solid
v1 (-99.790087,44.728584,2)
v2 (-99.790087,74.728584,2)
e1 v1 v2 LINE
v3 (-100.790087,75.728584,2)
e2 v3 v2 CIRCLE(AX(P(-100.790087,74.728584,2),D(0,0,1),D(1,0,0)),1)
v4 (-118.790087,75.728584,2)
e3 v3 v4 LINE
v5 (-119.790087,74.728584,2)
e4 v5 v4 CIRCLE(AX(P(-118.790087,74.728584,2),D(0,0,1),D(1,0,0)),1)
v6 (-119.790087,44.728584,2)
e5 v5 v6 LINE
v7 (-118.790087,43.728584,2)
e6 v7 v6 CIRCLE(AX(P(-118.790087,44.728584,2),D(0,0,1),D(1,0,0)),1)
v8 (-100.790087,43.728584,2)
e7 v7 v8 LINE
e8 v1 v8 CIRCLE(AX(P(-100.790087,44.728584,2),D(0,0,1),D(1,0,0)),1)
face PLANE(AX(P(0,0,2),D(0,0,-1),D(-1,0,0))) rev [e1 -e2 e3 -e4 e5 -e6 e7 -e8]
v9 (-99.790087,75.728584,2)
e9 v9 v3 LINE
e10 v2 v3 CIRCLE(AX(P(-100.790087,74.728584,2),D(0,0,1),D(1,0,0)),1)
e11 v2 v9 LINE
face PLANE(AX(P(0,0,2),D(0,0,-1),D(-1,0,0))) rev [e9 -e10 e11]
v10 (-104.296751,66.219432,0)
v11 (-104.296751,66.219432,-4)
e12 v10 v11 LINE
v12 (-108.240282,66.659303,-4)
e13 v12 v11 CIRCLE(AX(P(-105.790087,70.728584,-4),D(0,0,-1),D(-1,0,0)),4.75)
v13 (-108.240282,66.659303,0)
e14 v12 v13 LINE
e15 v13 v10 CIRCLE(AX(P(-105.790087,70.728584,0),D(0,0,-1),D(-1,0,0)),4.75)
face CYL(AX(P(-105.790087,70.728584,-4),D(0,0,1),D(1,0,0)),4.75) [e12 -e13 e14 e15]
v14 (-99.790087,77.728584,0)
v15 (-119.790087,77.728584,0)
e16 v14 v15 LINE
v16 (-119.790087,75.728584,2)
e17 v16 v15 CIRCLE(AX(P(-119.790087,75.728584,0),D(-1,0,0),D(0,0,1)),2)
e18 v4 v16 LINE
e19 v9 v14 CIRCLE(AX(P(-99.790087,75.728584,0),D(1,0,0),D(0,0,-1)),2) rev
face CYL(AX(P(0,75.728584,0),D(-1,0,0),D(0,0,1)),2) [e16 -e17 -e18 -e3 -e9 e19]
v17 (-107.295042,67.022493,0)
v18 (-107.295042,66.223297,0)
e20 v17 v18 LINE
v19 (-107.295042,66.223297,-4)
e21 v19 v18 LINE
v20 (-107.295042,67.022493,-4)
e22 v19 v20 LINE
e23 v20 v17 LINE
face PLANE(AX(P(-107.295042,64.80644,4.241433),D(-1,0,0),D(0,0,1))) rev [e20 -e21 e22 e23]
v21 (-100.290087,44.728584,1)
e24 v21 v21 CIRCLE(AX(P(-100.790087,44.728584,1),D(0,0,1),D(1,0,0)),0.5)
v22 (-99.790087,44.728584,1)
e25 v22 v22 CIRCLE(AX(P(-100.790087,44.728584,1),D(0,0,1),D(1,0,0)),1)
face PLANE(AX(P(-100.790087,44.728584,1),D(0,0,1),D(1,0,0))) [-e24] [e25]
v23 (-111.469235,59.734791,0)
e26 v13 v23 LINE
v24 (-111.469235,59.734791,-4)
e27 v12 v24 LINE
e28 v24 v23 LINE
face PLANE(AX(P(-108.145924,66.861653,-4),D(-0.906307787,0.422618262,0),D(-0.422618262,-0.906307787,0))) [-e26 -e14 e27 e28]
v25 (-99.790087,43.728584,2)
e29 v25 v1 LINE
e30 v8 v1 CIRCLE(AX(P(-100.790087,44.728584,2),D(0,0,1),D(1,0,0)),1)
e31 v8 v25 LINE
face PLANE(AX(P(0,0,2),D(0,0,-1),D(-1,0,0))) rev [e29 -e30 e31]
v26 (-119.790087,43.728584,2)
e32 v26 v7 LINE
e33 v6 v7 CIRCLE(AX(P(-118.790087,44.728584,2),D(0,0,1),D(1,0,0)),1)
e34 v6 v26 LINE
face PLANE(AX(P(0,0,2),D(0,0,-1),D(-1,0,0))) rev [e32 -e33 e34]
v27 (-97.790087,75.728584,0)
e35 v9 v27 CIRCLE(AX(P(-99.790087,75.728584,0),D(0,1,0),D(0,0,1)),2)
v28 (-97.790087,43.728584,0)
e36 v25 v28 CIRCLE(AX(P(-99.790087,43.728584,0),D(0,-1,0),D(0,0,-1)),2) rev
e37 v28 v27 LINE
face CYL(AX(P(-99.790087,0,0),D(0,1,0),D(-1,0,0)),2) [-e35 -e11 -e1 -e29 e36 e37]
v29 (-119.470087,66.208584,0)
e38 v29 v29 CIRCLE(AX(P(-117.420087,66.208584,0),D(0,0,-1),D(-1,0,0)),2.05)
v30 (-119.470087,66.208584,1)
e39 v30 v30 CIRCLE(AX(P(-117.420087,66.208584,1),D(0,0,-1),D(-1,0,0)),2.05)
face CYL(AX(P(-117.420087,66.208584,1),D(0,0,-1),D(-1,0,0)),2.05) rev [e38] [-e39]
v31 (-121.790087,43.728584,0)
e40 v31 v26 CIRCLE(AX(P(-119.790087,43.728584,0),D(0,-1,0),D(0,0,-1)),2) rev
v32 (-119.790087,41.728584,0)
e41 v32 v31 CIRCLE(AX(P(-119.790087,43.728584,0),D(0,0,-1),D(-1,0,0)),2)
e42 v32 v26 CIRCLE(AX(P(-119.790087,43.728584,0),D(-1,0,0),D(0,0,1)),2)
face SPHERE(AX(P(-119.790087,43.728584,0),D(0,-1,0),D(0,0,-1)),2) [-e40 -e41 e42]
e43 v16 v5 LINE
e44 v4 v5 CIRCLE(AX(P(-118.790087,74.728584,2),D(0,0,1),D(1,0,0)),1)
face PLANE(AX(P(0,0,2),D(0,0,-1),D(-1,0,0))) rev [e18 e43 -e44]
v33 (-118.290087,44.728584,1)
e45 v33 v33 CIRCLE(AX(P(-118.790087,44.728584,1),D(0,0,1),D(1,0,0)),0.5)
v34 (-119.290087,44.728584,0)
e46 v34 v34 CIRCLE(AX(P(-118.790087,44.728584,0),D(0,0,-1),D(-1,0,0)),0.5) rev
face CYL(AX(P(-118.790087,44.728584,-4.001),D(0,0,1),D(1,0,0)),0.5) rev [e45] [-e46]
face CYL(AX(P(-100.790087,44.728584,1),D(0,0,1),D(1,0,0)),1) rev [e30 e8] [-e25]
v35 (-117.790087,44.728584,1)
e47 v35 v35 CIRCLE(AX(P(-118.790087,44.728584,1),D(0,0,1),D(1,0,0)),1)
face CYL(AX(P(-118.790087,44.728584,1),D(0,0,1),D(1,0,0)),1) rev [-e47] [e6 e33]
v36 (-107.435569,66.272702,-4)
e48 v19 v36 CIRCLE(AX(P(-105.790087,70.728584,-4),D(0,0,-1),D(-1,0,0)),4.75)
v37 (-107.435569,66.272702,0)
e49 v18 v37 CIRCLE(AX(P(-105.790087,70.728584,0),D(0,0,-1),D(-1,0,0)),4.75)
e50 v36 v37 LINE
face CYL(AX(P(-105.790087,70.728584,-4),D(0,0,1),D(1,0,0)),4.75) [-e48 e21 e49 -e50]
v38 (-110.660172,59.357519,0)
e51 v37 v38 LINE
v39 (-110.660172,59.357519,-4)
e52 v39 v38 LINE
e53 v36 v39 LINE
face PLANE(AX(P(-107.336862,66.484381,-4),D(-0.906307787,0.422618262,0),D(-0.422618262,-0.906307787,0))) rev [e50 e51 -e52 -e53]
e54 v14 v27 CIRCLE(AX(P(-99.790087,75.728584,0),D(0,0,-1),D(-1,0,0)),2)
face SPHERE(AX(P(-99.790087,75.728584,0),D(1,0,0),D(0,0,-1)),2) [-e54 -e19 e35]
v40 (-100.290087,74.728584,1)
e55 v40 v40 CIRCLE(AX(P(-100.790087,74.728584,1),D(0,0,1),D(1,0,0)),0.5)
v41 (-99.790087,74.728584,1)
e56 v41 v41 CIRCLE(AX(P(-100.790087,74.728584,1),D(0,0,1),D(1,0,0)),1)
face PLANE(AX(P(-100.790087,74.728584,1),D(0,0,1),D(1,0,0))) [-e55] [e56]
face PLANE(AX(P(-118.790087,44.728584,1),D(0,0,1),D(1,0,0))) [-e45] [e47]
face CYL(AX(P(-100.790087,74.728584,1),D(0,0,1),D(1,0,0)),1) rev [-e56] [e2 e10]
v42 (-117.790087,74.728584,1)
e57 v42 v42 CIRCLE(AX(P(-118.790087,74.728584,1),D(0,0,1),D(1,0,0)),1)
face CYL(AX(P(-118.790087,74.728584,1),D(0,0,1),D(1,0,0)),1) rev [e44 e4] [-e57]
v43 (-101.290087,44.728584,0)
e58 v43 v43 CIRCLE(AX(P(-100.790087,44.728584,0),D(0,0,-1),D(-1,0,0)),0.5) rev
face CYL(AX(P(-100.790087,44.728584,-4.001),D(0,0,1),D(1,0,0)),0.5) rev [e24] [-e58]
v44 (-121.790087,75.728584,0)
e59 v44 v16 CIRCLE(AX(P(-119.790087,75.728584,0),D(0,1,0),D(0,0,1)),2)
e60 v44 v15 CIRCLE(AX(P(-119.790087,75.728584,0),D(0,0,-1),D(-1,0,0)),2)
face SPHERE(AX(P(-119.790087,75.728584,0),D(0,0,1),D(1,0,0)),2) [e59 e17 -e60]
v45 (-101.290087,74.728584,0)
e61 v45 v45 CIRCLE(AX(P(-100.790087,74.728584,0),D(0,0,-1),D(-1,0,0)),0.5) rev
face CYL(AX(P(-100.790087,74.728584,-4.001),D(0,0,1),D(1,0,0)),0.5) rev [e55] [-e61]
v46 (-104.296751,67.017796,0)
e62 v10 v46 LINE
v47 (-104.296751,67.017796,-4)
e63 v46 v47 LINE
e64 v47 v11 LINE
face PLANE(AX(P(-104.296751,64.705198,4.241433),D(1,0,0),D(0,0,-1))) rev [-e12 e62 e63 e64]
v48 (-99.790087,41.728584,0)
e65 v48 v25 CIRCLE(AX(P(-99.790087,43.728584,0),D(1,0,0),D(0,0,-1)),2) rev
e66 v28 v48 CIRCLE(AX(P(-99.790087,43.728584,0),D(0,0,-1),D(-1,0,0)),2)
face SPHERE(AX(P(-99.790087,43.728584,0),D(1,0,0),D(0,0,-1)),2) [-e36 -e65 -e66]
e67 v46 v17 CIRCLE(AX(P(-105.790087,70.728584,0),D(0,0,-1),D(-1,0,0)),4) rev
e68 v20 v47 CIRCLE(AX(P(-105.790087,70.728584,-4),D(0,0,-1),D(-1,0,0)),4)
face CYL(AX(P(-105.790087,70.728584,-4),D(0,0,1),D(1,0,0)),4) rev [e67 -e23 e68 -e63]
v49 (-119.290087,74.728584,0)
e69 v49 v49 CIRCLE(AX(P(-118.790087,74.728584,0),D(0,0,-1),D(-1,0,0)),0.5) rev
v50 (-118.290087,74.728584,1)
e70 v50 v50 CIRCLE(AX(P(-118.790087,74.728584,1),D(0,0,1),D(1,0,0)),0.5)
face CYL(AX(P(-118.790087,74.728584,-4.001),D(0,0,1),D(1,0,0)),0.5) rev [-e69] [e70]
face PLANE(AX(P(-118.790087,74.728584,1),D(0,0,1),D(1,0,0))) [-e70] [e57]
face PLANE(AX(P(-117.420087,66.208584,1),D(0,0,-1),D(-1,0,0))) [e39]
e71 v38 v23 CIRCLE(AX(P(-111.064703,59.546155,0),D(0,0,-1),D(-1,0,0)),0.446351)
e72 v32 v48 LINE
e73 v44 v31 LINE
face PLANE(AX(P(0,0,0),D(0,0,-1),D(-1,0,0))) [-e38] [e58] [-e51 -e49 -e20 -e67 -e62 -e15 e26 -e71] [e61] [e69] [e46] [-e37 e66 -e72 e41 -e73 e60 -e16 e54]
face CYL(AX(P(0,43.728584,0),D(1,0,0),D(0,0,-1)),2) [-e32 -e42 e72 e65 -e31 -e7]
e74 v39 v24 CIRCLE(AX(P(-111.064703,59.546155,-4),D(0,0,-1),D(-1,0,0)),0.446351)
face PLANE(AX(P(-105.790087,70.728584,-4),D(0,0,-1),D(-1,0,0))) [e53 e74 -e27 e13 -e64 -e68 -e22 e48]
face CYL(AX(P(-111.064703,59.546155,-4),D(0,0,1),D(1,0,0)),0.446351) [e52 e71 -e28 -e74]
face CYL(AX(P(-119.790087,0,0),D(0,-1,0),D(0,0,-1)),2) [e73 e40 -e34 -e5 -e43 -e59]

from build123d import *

# Parameters (mm, degrees)
SKETCH_1_W          = 24
SKETCH_1_H          = 36
EXTRUDE_1_DEPTH     = 2
FILLET_1_R          = 2
SKETCH_4_R          = 2.05
CUT_EXTRUDE_1_DEPTH = 1
SKETCH_7_R          = 4.75
SKETCH_7_R_2        = 4
EXTRUDE_2_DEPTH     = 4
CUT_EXTRUDE_2_DEPTH = 4
SKETCH_9_R          = 1
CUT_EXTRUDE_3_DEPTH = 1
CUT_EXTRUDE_4_REACH = 146.567
SKETCH_10_R         = 0.5
EXTRUDE_3_DEPTH     = 4


with BuildPart() as part:
    # 草图1 → 凸台-拉伸1 (new body)
    with BuildSketch(Plane.XY):
        with Locations((-109.790086771, 59.72858385)):
            Rectangle(SKETCH_1_W, SKETCH_1_H)
    extrude(amount=EXTRUDE_1_DEPTH)

    # 圆角1
    fillet_1_edges = [part.edges().sort_by_distance(p)[0] for p in [
        (-121.790086771, 59.72858385, 2),
        (-109.790086771, 41.72858385, 2),
        (-97.790086771, 59.72858385, 2),
        (-97.790086771, 41.72858385, 1),
        (-121.790086771, 41.72858385, 1),
        (-121.790086771, 77.72858385, 1),
        (-97.790086771, 77.72858385, 1),
        (-109.790086771, 77.72858385, 2),
    ]]
    fillet(fillet_1_edges, radius=FILLET_1_R - 0.0001)  # a hair under: the kernel refuses the full size

    # 草图4 → 切除-拉伸1 (cut)
    with BuildSketch(Plane(origin=(0, 0, 0), x_dir=(-1, 0, 0), z_dir=(0, 0, -1))):
        with Locations((117.420086771, 66.20858385)):
            Circle(SKETCH_4_R)
    extrude(amount=-CUT_EXTRUDE_1_DEPTH, mode=Mode.SUBTRACT)

    # 草图7 → 凸台-拉伸2 (add)
    with BuildSketch(Plane(origin=(0, 0, 0), x_dir=(-1, 0, 0), z_dir=(0, 0, -1))):
        with Locations((105.790086771, 70.72858385)):
            Circle(SKETCH_7_R)
        with Locations((105.790086771, 70.72858385)):
            Circle(SKETCH_7_R_2, mode=Mode.SUBTRACT)
    extrude(amount=EXTRUDE_2_DEPTH)

    # 草图8 → 切除-拉伸2 (cut)
    with BuildSketch(Plane(origin=(0, 0, -4), x_dir=(-1, 0, 0), z_dir=(0, 0, -1))):
        Polygon((107.295042198, 64.806439923), (104.296751001, 64.705198151), (104.296751001, 67.705198151), (107.295042198, 67.705198151), align=None)
    extrude(amount=-CUT_EXTRUDE_2_DEPTH, mode=Mode.SUBTRACT)

    # 草图9 → 切除-拉伸3 (cut)
    with BuildSketch(Plane.XY.offset(2)):
        with Locations((-100.790086771, 74.72858385)):
            Circle(SKETCH_9_R)
        with Locations((-100.790086771, 44.72858385)):
            Circle(SKETCH_9_R)
        with Locations((-118.790086771, 44.72858385)):
            Circle(SKETCH_9_R)
        with Locations((-118.790086771, 74.72858385)):
            Circle(SKETCH_9_R)
    extrude(amount=-CUT_EXTRUDE_3_DEPTH, mode=Mode.SUBTRACT)

    # 草图10 → 切除-拉伸4 (cut, up to next)
    with BuildSketch(Plane.XY.offset(1), mode=Mode.PRIVATE) as cut_extrude_4_sk1:
        with Locations((-118.790086771, 44.72858385)):
            Circle(SKETCH_10_R)
    cut_extrude_4_tool1 = extrude(cut_extrude_4_sk1.sketch, amount=-CUT_EXTRUDE_4_REACH, mode=Mode.PRIVATE) & part.part
    # 草图10 → 切除-拉伸4 (cut, up to next)
    with BuildSketch(Plane.XY.offset(1), mode=Mode.PRIVATE) as cut_extrude_4_sk2:
        with Locations((-100.790086771, 44.72858385)):
            Circle(SKETCH_10_R)
    cut_extrude_4_tool2 = extrude(cut_extrude_4_sk2.sketch, amount=-CUT_EXTRUDE_4_REACH, mode=Mode.PRIVATE) & part.part
    # 草图10 → 切除-拉伸4 (cut, up to next)
    with BuildSketch(Plane.XY.offset(1), mode=Mode.PRIVATE) as cut_extrude_4_sk3:
        with Locations((-100.790086771, 74.72858385)):
            Circle(SKETCH_10_R)
    cut_extrude_4_tool3 = extrude(cut_extrude_4_sk3.sketch, amount=-CUT_EXTRUDE_4_REACH, mode=Mode.PRIVATE) & part.part
    # 草图10 → 切除-拉伸4 (cut, up to next)
    with BuildSketch(Plane.XY.offset(1), mode=Mode.PRIVATE) as cut_extrude_4_sk4:
        with Locations((-118.790086771, 74.72858385)):
            Circle(SKETCH_10_R)
    cut_extrude_4_tool4 = extrude(cut_extrude_4_sk4.sketch, amount=-CUT_EXTRUDE_4_REACH, mode=Mode.PRIVATE) & part.part
    add(cut_extrude_4_tool1.solids().sort_by_distance((-118.790087, 44.728584, 1))[0], mode=Mode.SUBTRACT)
    add(cut_extrude_4_tool2.solids().sort_by_distance((-100.790087, 44.728584, 1))[0], mode=Mode.SUBTRACT)
    add(cut_extrude_4_tool3.solids().sort_by_distance((-100.790087, 74.728584, 1))[0], mode=Mode.SUBTRACT)
    add(cut_extrude_4_tool4.solids().sort_by_distance((-118.790087, 74.728584, 1))[0], mode=Mode.SUBTRACT)

    # 草图12 → 凸台-拉伸3 (add)
    with BuildSketch(Plane(origin=(0, 0, 0), x_dir=(-1, 0, 0), z_dir=(0, 0, -1))):
        with BuildLine():
            Line((108.145924466, 66.861652665), (111.46923478, 59.734790696))
            ThreePointArc((111.46923478, 59.734790696), (111.253339507, 59.141623309), (110.66017212, 59.357518582))
            Line((110.66017212, 59.357518582), (107.336861805, 66.484380551))
            ThreePointArc((107.336861805, 66.484380551), (107.552757078, 67.077547938), (108.145924466, 66.861652665))
        make_face()
    extrude(amount=EXTRUDE_3_DEPTH)


solid = part.part
